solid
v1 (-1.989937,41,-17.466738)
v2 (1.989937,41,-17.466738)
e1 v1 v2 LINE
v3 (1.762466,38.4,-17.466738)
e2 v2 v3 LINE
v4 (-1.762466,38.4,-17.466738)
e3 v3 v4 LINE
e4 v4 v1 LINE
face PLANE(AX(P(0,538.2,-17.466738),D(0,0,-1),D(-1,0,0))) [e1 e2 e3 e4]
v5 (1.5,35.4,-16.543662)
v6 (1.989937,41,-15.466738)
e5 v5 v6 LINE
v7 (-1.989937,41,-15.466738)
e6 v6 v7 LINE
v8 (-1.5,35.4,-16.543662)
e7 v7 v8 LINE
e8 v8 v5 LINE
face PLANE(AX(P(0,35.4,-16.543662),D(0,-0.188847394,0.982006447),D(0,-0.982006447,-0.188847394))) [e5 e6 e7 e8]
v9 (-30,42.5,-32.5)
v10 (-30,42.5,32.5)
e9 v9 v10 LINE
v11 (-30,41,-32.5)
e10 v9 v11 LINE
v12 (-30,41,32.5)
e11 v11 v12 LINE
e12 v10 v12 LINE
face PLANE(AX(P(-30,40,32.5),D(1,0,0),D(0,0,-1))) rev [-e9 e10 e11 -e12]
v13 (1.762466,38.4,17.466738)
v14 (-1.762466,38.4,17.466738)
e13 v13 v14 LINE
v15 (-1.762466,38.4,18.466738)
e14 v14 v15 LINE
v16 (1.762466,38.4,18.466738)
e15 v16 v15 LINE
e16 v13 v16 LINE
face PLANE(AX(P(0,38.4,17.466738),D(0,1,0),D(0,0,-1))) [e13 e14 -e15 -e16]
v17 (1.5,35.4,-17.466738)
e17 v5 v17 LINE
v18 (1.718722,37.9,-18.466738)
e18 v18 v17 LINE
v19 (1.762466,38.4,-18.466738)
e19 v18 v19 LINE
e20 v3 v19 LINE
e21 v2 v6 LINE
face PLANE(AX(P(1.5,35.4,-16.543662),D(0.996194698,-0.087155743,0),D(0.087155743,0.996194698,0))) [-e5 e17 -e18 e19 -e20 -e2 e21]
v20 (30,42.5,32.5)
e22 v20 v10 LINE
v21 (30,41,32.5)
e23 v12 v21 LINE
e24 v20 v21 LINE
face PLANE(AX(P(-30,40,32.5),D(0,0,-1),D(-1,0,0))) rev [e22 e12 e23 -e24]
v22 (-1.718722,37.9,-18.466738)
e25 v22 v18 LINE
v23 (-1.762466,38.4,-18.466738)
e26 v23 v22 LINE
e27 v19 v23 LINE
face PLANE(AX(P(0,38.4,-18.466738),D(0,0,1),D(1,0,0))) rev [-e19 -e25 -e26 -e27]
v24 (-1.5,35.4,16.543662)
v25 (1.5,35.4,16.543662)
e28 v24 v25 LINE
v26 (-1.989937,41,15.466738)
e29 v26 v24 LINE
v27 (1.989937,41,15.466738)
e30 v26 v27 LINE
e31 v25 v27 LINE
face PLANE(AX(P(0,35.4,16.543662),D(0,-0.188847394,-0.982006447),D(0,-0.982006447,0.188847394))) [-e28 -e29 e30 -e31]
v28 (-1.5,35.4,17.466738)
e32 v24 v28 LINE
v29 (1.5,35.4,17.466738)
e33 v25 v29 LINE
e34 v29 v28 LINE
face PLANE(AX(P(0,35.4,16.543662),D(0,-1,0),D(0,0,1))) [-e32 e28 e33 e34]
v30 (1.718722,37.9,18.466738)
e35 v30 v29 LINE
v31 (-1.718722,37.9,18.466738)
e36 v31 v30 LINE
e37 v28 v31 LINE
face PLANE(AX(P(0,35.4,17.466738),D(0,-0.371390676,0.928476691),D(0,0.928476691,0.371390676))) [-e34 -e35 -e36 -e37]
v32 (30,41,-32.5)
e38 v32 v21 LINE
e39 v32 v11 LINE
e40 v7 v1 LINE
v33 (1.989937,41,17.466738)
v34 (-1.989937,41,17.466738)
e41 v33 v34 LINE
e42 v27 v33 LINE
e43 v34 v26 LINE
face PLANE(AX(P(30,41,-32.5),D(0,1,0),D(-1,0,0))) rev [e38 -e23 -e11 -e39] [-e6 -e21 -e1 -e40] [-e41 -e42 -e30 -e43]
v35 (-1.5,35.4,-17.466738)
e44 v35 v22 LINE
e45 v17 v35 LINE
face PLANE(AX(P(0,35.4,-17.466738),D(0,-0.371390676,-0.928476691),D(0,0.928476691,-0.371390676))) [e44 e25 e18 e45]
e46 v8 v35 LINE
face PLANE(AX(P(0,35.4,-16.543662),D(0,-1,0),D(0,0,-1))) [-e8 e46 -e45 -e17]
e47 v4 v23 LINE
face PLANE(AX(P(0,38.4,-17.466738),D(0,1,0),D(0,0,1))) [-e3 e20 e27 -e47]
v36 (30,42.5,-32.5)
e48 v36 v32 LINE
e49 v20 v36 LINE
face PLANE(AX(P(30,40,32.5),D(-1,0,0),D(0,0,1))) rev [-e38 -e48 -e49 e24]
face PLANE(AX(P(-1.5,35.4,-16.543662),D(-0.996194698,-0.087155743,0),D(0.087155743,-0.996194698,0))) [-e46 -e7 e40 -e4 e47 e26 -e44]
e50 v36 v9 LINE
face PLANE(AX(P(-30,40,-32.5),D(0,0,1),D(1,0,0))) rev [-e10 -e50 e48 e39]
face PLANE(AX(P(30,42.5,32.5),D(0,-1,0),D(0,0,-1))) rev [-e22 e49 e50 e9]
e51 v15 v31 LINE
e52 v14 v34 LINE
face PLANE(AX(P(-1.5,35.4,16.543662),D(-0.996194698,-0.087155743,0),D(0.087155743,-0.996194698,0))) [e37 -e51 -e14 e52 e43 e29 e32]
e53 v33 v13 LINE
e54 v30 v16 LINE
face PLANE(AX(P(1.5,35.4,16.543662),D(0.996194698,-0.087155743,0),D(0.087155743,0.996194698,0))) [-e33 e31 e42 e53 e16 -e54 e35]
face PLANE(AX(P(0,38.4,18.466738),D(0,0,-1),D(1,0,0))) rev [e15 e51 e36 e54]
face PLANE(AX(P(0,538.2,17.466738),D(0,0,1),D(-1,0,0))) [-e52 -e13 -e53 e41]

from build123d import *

# Parameters (mm, degrees)
SKETCH1_W               = 60
SKETCH1_H               = 65
SKETCH1_W_2             = 55
SKETCH1_H_2             = 60
BOSS_EXTRUDE1_DEPTH     = 40
SKETCH2_W               = 60
SKETCH2_H               = 65
BOSS_EXTRUDE2_DEPTH     = 2.5
BOSS_EXTRUDE3_DEPTH     = 65
CUT_EXTRUDE1_REACH      = 83.03
CUT_EXTRUDE2_DEPTH      = 84.873058845
CUT_EXTRUDE2_DEPTH_BACK = 84.873058845
SKETCH5_W               = 60
SKETCH5_H               = 41
SNAP_START              = -17.466738465
SNAP_HOOK1_DEPTH        = 0.923076923
SNAP_START_2            = -1.762465991
SNAP_HOOK1_2_DEPTH      = 3.524931982
SNAP_START_3            = -1.989936516
SNAP_HOOK1_3_DEPTH      = 3.979873032
SNAP_START_4            = -19
SNAP_HOOK1_4_DEPTH      = 5
CUT_EXTRUDE3_DEPTH      = 73.867619695
CUT_EXTRUDE3_DEPTH_BACK = 73.867619695
SKETCH6_W               = 60.42921797
SKETCH6_H               = 2.598338556


with BuildPart() as part:
    # Sketch1 → Boss-Extrude1 (new body)
    with BuildSketch(Plane(origin=(0, 0, 0), x_dir=(1, 0, 0), z_dir=(0, 1, 0))):
        Rectangle(SKETCH1_W, SKETCH1_H)
        Rectangle(SKETCH1_W_2, SKETCH1_H_2, mode=Mode.SUBTRACT)
    extrude(amount=BOSS_EXTRUDE1_DEPTH)

    # Sketch2 → Boss-Extrude2 (add)
    with BuildSketch(Plane(origin=(0, 40, 0), x_dir=(1, 0, 0), z_dir=(0, 1, 0))):
        Rectangle(SKETCH2_W, SKETCH2_H)
    extrude(amount=BOSS_EXTRUDE2_DEPTH)

    # Sketch3 → Boss-Extrude3 (add)
    with BuildSketch(Plane(origin=(0, 0, -32.5), x_dir=(-1, 0, 0), z_dir=(0, 0, -1))):
        Polygon((-30, 42.5), (-28.8, 43.7), (-27.6, 42.5), (-26.4, 43.7), (-25.2, 42.5), (-24, 43.7), (-22.8, 42.5), (-21.6, 43.7), (-20.4, 42.5), (-19.2, 43.7), (-18, 42.5), (-16.8, 43.7), (-15.6, 42.5), (-14.4, 43.7), (-13.2, 42.5), (-12, 43.7), (-10.8, 42.5), (-9.6, 43.7), (-8.4, 42.5), (-7.2, 43.7), (-6, 42.5), (-4.8, 43.7), (-3.6, 42.5), (-2.4, 43.7), (-1.2, 42.5), (0, 43.7), (1.2, 42.5), (2.4, 43.7), (3.6, 42.5), (4.8, 43.7), (6, 42.5), (7.2, 43.7), (8.4, 42.5), (9.6, 43.7), (10.8, 42.5), (12, 43.7), (13.2, 42.5), (14.4, 43.7), (15.6, 42.5), (16.8, 43.7), (18, 42.5), (19.2, 43.7), (20.4, 42.5), (21.6, 43.7), (22.8, 42.5), (24, 43.7), (25.2, 42.5), (26.4, 43.7), (27.6, 42.5), (28.8, 43.7), (30, 42.5), (30, 42.170064374), (-30, 42.170064374), align=None)
    extrude(amount=-BOSS_EXTRUDE3_DEPTH)

    # Cut-Extrude1: up to this face of the body (flat: up to its plane)
    cut_extrude1_end = Plane(part.part.faces().sort_by_distance((30, 21.25, 0))[0])
    # Sketch4 → Cut-Extrude1 (cut, up to the picked face)
    with BuildSketch(Plane.ZY.offset(30), mode=Mode.PRIVATE) as cut_extrude1_sk1:
        with BuildLine():
            Line((-32.5, 42.5), (-32.5, 43.7))
            Line((-32.5, 43.7), (-31.3, 43.7))
            ThreePointArc((-31.3, 43.7), (-32.148528137, 43.348528137), (-32.5, 42.5))
        make_face()
    cut_extrude1_tool1 = split(extrude(cut_extrude1_sk1.sketch, amount=-CUT_EXTRUDE1_REACH, mode=Mode.PRIVATE), bisect_by=cut_extrude1_end, keep=Keep.BOTH, mode=Mode.PRIVATE)
    cut_extrude1 = cut_extrude1_tool1.solids().sort_by(Axis((-30, 43.431958, -32.231958), (1, 0, 0)))[0]
    add(cut_extrude1, mode=Mode.SUBTRACT)

    # Mirror1: Cut-Extrude1 across plane
    add(cut_extrude1.mirror(Plane.XY), mode=Mode.SUBTRACT)

    # Sketch5 → Cut-Extrude2 (cut, two sides: drawn at the far end of the back side and taken through both)
    with BuildSketch(Plane.XY.offset(32.5).offset(-CUT_EXTRUDE2_DEPTH_BACK)):
        with Locations((0, 20.5)):
            Rectangle(SKETCH5_W, SKETCH5_H)
    extrude(amount=CUT_EXTRUDE2_DEPTH + CUT_EXTRUDE2_DEPTH_BACK, mode=Mode.SUBTRACT)

    # Snap Hook1: read off the stored shape, not the designer's step
    # Snap Hook1 outline → Snap Hook1 (add)
    with BuildSketch(Plane.XY.offset(SNAP_START)):
        Polygon((-1.5, 35.4), (1.5, 35.4), (1.989936516, 41), (-1.989936516, 41), align=None)
    snap_hook1 = extrude(amount=SNAP_HOOK1_DEPTH)

    # Snap Hook1 2 outline → Snap Hook1 2 (add)
    with BuildSketch(Plane.YZ.offset(SNAP_START_2)):
        Polygon((38.4, -17.466738465), (35.4, -17.466738465), (37.9, -18.466738465), (38.4, -18.466738465), align=None)
        Polygon((35.4, -16.543661542), (41, -16.543661542), (41, -15.466738465), align=None)
    snap_hook1_2 = extrude(amount=SNAP_HOOK1_2_DEPTH)

    # Snap Hook1 3 outline → Snap Hook1 3 (add)
    with BuildSketch(Plane.YZ.offset(SNAP_START_3)):
        Polygon((35.4, -16.543661542), (41, -16.543661542), (41, -15.466738465), align=None)
    snap_hook1_3 = extrude(amount=SNAP_HOOK1_3_DEPTH)

    # Snap Hook1 4 outline → Snap Hook1 4 (cut)
    with BuildSketch(Plane.XY.offset(SNAP_START_4)):
        Polygon((-1.989936516, 41), (-1.989936516, 34), (-1.377515871, 34), align=None)
        Polygon((1.377515871, 34), (1.989936516, 34), (1.989936516, 41), align=None)
    snap_hook1_4 = extrude(amount=SNAP_HOOK1_4_DEPTH, mode=Mode.SUBTRACT)

    # Mirror2: Snap Hook1, Snap Hook1 2, Snap Hook1 3, Snap Hook1 4 across plane
    add(snap_hook1.mirror(Plane.XY))
    add(snap_hook1_2.mirror(Plane.XY))
    add(snap_hook1_3.mirror(Plane.XY))
    add(snap_hook1_4.mirror(Plane.XY), mode=Mode.SUBTRACT)

    # Sketch6 → Cut-Extrude3 (cut, two sides: drawn at the far end of the back side and taken through both)
    with BuildSketch(Plane(origin=(0, 0, -17.5), x_dir=(-1, 0, 0), z_dir=(0, 0, -1)).offset(-CUT_EXTRUDE3_DEPTH_BACK)):
        with Locations((0.214608985, 43.799169278)):
            Rectangle(SKETCH6_W, SKETCH6_H)
    extrude(amount=CUT_EXTRUDE3_DEPTH + CUT_EXTRUDE3_DEPTH_BACK, mode=Mode.SUBTRACT)


solid = part.part
